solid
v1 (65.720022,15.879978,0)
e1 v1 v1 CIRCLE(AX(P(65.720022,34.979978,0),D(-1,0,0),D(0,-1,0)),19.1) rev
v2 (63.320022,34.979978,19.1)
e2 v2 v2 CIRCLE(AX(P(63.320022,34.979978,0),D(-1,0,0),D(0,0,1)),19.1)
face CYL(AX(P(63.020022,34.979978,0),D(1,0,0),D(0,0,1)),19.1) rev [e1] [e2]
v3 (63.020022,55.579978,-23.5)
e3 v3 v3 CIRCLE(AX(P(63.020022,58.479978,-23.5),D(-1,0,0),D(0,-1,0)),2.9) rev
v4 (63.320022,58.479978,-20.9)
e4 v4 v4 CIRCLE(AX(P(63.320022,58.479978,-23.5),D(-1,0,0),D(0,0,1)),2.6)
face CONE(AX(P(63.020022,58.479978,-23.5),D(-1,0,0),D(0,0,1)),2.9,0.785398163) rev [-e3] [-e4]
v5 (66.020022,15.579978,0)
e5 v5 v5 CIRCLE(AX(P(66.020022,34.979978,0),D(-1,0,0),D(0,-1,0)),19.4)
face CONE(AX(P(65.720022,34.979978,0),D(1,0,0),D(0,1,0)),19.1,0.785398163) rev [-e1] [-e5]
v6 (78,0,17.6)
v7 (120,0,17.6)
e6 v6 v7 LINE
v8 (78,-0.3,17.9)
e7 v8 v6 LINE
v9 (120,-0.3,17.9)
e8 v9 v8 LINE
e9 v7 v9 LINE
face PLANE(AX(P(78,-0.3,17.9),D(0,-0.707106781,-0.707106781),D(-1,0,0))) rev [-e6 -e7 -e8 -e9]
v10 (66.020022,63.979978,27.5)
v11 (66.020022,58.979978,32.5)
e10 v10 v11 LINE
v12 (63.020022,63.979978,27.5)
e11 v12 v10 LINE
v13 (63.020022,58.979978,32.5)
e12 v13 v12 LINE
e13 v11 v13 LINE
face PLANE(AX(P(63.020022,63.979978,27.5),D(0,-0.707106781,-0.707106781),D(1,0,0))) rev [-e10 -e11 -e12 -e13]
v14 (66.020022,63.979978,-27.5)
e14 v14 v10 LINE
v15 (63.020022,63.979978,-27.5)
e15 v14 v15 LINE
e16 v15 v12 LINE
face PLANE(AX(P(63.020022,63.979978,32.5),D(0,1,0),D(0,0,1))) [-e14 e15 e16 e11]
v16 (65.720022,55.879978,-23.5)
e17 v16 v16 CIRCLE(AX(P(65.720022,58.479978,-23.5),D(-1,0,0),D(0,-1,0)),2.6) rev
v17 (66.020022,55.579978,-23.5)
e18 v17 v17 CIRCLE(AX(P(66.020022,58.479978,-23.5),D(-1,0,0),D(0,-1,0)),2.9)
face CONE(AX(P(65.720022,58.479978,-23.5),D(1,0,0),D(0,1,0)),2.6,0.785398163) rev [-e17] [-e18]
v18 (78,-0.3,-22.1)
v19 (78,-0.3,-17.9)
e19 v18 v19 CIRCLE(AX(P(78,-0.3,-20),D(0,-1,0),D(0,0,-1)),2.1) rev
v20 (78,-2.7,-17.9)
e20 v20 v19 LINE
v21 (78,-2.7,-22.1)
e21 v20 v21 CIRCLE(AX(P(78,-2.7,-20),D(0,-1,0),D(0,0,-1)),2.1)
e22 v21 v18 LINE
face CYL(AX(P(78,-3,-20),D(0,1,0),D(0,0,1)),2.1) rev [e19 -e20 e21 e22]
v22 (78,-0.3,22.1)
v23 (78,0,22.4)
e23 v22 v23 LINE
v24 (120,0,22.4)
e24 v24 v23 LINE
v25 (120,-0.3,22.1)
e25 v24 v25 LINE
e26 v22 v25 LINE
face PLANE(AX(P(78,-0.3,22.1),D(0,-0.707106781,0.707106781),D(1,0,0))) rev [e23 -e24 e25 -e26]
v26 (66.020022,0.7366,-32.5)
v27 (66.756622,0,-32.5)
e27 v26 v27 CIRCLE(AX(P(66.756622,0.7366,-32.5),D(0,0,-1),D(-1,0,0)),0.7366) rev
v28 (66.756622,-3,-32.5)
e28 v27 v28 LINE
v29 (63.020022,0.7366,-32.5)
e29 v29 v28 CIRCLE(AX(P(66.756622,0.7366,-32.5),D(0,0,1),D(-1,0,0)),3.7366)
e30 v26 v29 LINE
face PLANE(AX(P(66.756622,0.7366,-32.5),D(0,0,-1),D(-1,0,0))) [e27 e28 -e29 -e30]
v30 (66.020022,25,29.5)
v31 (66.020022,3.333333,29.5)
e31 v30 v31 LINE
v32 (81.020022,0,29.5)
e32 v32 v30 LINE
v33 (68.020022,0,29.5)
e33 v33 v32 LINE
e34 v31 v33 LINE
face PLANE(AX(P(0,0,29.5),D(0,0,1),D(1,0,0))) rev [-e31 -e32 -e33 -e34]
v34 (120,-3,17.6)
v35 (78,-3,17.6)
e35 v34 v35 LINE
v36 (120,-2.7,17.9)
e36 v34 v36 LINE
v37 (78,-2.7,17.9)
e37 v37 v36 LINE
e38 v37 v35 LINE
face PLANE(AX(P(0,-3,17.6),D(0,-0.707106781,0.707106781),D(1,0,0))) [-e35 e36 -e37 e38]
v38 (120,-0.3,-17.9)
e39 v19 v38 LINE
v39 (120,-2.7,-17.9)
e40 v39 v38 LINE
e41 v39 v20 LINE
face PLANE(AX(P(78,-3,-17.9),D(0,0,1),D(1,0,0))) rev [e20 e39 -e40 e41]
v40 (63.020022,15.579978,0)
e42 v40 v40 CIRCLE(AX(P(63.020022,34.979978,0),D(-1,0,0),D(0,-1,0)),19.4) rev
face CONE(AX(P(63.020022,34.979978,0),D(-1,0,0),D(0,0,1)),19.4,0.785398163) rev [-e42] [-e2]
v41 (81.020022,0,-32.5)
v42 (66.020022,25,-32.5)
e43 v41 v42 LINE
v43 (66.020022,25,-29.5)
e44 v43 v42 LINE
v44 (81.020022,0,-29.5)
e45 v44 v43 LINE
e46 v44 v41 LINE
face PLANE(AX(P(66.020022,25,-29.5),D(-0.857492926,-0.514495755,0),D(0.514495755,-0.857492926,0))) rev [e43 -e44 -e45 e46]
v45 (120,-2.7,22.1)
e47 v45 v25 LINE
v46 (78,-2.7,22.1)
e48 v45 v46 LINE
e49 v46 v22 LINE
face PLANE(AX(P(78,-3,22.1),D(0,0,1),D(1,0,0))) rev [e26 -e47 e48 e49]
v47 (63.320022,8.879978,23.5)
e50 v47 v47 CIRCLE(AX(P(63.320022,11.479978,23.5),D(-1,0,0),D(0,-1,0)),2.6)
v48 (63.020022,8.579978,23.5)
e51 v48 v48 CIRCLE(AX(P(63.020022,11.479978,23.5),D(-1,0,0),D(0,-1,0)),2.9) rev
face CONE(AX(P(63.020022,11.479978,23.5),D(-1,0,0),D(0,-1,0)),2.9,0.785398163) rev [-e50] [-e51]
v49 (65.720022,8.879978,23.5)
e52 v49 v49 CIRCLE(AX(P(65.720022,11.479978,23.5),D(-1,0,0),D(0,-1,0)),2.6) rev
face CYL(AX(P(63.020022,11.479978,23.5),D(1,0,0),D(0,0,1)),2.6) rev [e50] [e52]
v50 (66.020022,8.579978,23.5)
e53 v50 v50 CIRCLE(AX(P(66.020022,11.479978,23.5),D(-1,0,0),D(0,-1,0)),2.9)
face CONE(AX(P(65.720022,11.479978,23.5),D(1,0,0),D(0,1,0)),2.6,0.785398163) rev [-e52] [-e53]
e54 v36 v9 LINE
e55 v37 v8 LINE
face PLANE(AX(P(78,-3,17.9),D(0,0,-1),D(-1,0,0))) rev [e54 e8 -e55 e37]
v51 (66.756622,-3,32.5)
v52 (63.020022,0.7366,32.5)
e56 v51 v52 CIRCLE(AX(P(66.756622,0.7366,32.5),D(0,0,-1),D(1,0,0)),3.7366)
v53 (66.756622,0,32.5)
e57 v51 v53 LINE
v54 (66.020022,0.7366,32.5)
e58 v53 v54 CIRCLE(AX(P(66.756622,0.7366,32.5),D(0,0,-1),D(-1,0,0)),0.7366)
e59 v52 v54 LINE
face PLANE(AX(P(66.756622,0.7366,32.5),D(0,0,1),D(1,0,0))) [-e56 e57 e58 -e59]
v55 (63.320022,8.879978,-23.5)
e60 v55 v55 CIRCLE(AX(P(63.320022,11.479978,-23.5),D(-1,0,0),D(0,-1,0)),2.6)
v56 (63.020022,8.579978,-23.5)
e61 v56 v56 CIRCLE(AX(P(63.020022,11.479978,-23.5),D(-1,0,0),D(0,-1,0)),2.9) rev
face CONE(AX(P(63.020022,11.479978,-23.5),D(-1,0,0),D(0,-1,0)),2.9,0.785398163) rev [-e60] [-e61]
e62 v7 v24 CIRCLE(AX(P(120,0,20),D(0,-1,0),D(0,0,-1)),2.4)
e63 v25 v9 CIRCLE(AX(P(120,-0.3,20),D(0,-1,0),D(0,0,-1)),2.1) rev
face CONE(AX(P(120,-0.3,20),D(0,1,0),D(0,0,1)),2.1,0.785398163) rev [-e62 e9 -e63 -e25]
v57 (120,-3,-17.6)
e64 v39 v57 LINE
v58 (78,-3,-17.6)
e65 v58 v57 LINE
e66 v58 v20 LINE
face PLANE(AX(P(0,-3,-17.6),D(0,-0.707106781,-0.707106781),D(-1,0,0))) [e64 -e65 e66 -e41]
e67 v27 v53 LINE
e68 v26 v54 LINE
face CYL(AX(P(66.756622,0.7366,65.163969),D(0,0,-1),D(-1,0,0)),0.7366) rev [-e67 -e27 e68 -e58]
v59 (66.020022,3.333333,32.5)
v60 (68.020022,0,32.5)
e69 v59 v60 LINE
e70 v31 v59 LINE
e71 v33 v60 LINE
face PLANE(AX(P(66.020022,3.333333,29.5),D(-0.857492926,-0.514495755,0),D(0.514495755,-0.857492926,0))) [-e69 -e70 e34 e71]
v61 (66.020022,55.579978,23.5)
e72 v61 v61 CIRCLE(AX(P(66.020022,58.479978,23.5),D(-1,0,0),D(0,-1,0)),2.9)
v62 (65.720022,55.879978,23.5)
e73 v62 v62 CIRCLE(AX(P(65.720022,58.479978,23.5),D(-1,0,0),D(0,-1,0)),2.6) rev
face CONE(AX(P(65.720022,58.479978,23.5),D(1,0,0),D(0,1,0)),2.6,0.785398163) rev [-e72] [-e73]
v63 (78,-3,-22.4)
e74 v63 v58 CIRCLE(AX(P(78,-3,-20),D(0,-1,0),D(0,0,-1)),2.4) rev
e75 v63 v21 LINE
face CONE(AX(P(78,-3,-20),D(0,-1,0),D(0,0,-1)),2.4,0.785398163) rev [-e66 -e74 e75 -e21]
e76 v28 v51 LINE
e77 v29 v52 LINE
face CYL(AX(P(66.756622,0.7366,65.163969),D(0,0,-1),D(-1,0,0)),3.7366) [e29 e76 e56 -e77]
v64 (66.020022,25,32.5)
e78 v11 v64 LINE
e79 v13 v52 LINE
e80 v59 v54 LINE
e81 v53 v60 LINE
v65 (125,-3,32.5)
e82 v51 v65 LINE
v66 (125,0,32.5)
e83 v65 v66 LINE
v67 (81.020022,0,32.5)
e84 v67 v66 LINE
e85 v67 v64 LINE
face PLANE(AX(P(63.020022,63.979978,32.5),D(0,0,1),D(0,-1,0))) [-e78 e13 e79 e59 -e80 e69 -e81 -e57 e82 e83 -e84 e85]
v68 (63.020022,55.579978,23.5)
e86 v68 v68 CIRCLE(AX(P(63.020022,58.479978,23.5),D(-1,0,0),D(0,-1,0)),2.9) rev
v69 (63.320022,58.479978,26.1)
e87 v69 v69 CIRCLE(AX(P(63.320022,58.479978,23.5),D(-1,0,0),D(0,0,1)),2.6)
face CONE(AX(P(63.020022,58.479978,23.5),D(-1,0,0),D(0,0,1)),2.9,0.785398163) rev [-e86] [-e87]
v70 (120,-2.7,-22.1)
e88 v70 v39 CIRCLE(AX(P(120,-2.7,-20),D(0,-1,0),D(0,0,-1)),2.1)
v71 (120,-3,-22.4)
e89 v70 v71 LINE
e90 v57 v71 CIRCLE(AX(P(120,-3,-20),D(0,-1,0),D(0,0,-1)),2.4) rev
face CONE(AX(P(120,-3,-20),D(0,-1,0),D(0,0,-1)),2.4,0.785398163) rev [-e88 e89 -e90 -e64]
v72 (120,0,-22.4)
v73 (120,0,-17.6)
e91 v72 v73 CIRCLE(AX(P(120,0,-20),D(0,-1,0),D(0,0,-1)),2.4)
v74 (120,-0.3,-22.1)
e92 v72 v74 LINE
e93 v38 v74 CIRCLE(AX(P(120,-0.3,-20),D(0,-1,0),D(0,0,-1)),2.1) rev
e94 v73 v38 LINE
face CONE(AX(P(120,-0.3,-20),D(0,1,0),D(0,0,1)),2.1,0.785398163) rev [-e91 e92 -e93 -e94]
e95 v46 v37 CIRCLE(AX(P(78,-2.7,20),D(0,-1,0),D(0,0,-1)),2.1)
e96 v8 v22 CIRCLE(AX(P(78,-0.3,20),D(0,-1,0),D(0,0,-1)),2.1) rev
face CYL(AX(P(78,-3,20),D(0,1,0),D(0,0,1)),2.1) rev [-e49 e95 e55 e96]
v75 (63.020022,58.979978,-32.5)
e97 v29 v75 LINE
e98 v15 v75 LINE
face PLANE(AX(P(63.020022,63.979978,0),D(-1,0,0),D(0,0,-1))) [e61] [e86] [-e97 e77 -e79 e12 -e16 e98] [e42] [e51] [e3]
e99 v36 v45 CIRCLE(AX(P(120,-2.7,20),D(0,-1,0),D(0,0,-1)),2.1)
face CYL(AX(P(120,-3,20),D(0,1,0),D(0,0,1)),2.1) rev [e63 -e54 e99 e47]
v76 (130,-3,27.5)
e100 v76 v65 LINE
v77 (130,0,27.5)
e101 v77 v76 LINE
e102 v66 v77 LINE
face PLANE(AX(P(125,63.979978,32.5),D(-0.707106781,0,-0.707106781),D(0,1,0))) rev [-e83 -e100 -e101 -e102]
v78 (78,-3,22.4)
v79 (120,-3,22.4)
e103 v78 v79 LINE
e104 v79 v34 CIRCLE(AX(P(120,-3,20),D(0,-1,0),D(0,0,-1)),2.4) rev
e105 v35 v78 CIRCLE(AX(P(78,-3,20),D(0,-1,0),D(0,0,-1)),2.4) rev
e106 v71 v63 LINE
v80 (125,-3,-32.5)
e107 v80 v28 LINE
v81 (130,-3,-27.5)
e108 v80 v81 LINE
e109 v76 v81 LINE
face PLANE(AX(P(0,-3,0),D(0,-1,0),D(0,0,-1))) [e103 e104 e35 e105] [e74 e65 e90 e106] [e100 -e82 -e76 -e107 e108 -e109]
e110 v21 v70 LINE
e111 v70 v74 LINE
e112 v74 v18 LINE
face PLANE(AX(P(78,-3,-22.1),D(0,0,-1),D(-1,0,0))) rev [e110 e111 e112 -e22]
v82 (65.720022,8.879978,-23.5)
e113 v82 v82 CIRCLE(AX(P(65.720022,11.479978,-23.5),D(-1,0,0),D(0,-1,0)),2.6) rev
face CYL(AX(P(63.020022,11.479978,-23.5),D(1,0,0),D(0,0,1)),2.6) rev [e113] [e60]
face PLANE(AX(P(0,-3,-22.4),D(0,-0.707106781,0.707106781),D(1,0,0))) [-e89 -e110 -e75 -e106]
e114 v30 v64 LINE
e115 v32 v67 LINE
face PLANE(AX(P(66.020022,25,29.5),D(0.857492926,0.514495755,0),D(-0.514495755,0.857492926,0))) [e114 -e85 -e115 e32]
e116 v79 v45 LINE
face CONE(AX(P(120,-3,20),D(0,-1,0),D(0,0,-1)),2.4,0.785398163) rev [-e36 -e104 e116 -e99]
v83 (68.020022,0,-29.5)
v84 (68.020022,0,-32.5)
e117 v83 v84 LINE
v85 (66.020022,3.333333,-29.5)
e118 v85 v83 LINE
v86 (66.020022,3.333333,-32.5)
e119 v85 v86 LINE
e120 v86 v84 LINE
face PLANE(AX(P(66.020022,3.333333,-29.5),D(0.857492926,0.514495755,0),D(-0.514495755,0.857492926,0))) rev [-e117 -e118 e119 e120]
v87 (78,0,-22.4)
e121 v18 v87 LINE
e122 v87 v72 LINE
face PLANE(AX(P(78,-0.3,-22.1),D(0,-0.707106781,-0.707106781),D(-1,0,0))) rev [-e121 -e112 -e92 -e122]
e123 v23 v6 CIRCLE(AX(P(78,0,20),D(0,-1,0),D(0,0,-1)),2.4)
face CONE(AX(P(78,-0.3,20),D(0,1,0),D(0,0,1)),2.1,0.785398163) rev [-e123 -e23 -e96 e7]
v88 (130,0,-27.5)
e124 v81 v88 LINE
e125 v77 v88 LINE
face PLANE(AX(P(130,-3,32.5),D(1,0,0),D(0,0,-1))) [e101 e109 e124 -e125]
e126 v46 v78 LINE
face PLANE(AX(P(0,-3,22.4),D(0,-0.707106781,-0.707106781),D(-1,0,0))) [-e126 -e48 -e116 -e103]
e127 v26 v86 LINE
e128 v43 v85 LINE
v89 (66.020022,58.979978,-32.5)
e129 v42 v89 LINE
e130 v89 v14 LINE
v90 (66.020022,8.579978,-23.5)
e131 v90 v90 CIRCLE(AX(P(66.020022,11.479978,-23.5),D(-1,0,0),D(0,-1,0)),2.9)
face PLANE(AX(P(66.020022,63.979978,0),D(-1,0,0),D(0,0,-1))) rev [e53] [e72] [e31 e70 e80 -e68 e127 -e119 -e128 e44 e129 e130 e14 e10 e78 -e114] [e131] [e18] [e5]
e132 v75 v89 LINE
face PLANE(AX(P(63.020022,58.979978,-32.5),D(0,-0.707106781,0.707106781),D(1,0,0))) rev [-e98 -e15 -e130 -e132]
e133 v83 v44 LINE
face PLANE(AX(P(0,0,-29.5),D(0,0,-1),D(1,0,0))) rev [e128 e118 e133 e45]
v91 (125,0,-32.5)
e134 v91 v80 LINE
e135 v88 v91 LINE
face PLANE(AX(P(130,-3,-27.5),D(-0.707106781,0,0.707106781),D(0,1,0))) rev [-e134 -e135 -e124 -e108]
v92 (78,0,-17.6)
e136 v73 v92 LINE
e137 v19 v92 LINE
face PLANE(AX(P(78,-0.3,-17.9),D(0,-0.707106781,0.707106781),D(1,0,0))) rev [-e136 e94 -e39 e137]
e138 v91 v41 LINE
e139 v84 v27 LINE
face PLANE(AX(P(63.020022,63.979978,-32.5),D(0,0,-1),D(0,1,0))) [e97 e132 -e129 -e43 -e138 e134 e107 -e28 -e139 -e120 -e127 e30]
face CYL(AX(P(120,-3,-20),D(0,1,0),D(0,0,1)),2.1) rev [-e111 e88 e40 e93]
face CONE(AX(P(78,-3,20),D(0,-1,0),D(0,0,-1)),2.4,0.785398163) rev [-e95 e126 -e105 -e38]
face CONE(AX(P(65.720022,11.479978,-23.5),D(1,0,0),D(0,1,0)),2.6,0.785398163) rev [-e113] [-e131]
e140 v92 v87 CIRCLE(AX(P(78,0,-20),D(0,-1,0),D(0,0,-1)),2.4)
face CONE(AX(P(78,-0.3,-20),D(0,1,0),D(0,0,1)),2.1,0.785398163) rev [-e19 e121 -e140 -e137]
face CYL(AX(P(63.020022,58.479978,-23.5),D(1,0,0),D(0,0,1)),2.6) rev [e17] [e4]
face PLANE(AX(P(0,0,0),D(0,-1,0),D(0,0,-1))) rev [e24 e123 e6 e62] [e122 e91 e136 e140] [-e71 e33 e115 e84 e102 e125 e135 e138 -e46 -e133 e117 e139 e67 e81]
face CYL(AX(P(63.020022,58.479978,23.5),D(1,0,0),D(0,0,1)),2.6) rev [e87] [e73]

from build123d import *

# Parameters (mm, degrees)
SKETCH1_W                    = 130
SKETCH1_H                    = 65
BASE_FLANGE1_DEPTH           = 3
SKETCH2_R                    = 19.1
SKETCH2_R_2                  = 2.6
CUT_EXTRUDE1_DEPTH           = 135.034510481
CUT_EXTRUDE3_DEPTH           = 135.034510481
SKETCHED_BEND2_OUTLINE_W     = 3
SKETCHED_BEND2_OUTLINE_H     = 65
SKETCHED_BEND2_DEPTH         = 63.020021532
SKETCHED_START               = 63.383443248
SKETCHED_BEND2_2_OUTLINE_W   = 63.979978468
SKETCHED_BEND2_2_OUTLINE_H   = 65
SKETCHED_BEND2_2_OUTLINE_R   = 2.6
SKETCHED_BEND2_2_OUTLINE_R_2 = 19.1
SKETCHED_BEND2_2_DEPTH       = 2.636578284
SKETCHED_START_2             = 63.020021532
SKETCHED_BEND2_3_OUTLINE_W   = 63.979978468
SKETCHED_BEND2_3_OUTLINE_H   = 65
SKETCHED_BEND2_3_OUTLINE_R   = 2.6
SKETCHED_BEND2_3_OUTLINE_R_2 = 19.1
SKETCHED_BEND2_3_DEPTH       = 3.7366
SKETCHED_START_3             = -33
SKETCHED_BEND2_4_DEPTH       = 66
BOSS_EXTRUDE1_DEPTH          = 3
CHAMFER1_SIZE                = 5
CHAMFER2_SIZE                = 0.3


with BuildPart() as part:
    # Base-Flange1: sheet metal written as solids
    # Sketch1 → Base-Flange1 (new body)
    with BuildSketch(Plane(origin=(0, 0, 0), x_dir=(1, 0, 0), z_dir=(0, 1, 0))):
        with Locations((65, 0)):
            Rectangle(SKETCH1_W, SKETCH1_H)
    extrude(amount=-BASE_FLANGE1_DEPTH)

    # Sketch2 → Cut-Extrude1 (cut, through all)
    with BuildSketch(Plane(origin=(0, 0, 0), x_dir=(1, 0, 0), z_dir=(0, 1, 0))):
        with Locations(Location((29, 0, 0), (0, 0, 270))):
            Circle(SKETCH2_R)
        with Locations(Location((5.5, 23.5, 0), (0, 0, 270))):
            Circle(SKETCH2_R_2)
        with Locations(Location((52.5, 23.5, 0), (0, 0, 270))):
            Circle(SKETCH2_R_2)
        with Locations(Location((52.5, -23.5, 0), (0, 0, 270))):
            Circle(SKETCH2_R_2)
        with Locations(Location((5.5, -23.5, 0), (0, 0, 270))):
            Circle(SKETCH2_R_2)
    extrude(amount=-CUT_EXTRUDE1_DEPTH, mode=Mode.SUBTRACT)

    # Sketch4 → Cut-Extrude3 (cut, through all)
    with BuildSketch(Plane(origin=(0, 0, 0), x_dir=(1, 0, 0), z_dir=(0, 1, 0))):
        with BuildLine():
            Line((78, 22.1), (120, 22.1))
            ThreePointArc((120, 22.1), (122.1, 20), (120, 17.9))
            Line((120, 17.9), (78, 17.9))
            ThreePointArc((78, 17.9), (75.9, 20), (78, 22.1))
        make_face()
        with BuildLine():
            Line((78, -17.9), (120, -17.9))
            ThreePointArc((120, -17.9), (122.1, -20), (120, -22.1))
            Line((120, -22.1), (78, -22.1))
            ThreePointArc((78, -22.1), (75.9, -20), (78, -17.9))
        make_face()
    extrude(amount=-CUT_EXTRUDE3_DEPTH, mode=Mode.SUBTRACT)

    # Sketched Bend2: read off the stored shape, not the designer's step
    # Sketched Bend2 outline → Sketched Bend2 (cut)
    with BuildSketch(Plane.YZ):
        with Locations((-1.5, 0)):
            Rectangle(SKETCHED_BEND2_OUTLINE_W, SKETCHED_BEND2_OUTLINE_H)
    extrude(amount=SKETCHED_BEND2_DEPTH, mode=Mode.SUBTRACT)

    # Sketched Bend2 2 outline → Sketched Bend2 2 (add)
    with BuildSketch(Plane.YZ.offset(SKETCHED_START)):
        with Locations((31.989989234, 0)):
            Rectangle(SKETCHED_BEND2_2_OUTLINE_W, SKETCHED_BEND2_2_OUTLINE_H)
        with Locations((11.479978468, -23.5)):
            Circle(SKETCHED_BEND2_2_OUTLINE_R, mode=Mode.SUBTRACT)
        with Locations((58.479978468, -23.5)):
            Circle(SKETCHED_BEND2_2_OUTLINE_R, mode=Mode.SUBTRACT)
        with Locations((11.479978468, 23.5)):
            Circle(SKETCHED_BEND2_2_OUTLINE_R, mode=Mode.SUBTRACT)
        with Locations((34.979978468, 0)):
            Circle(SKETCHED_BEND2_2_OUTLINE_R_2, mode=Mode.SUBTRACT)
        with Locations((58.479978468, 23.5)):
            Circle(SKETCHED_BEND2_2_OUTLINE_R, mode=Mode.SUBTRACT)
    extrude(amount=SKETCHED_BEND2_2_DEPTH)

    # Sketched Bend2 3 outline → Sketched Bend2 3 (add)
    with BuildSketch(Plane.YZ.offset(SKETCHED_START_2)):
        with Locations((31.989989234, 0)):
            Rectangle(SKETCHED_BEND2_3_OUTLINE_W, SKETCHED_BEND2_3_OUTLINE_H)
        with Locations((11.479978468, -23.5)):
            Circle(SKETCHED_BEND2_3_OUTLINE_R, mode=Mode.SUBTRACT)
        with Locations((58.479978468, -23.5)):
            Circle(SKETCHED_BEND2_3_OUTLINE_R, mode=Mode.SUBTRACT)
        with Locations((11.479978468, 23.5)):
            Circle(SKETCHED_BEND2_3_OUTLINE_R, mode=Mode.SUBTRACT)
        with Locations((34.979978468, 0)):
            Circle(SKETCHED_BEND2_3_OUTLINE_R_2, mode=Mode.SUBTRACT)
        with Locations((58.479978468, 23.5)):
            Circle(SKETCHED_BEND2_3_OUTLINE_R, mode=Mode.SUBTRACT)
    extrude(amount=SKETCHED_BEND2_3_DEPTH)

    # Sketched Bend2 4 outline → Sketched Bend2 4 (cut)
    with BuildSketch(Plane.XY.offset(SKETCHED_START_3)):
        with BuildLine():
            Line((66.756621532, 63.979978468), (66.020021532, 63.979978468))
            Line((66.020021532, 63.979978468), (66.020021532, 0.7366))
            ThreePointArc((66.020021532, 0.7366), (66.235766677, 0.215745145), (66.756621532, 0))
            Line((66.756621532, 0), (66.756621532, 63.979978468))
        make_face()
        with BuildLine():
            ThreePointArc((66.756621532, -3), (64.114446333, -1.905575199), (63.020021532, 0.7366))
            Line((63.020021532, 0.7366), (63.020021532, -3))
            Line((63.020021532, -3), (66.756621532, -3))
        make_face()
    extrude(amount=SKETCHED_BEND2_4_DEPTH, mode=Mode.SUBTRACT)

    # Sketch6 → Boss-Extrude1 (add)
    with BuildSketch(Plane.XY.offset(32.5)):
        Polygon((66.020021532, 25), (81.020021532, 0), (68.020021532, 0), (66.020021532, 3.333333333), align=None)
    boss_extrude1 = extrude(amount=-BOSS_EXTRUDE1_DEPTH)

    # Mirror1: Boss-Extrude1 across plane
    add(boss_extrude1.mirror(Plane.XY))

    # Chamfer1
    chamfer1_edges = [part.edges().sort_by_distance(p)[0] for p in [
        (64.520021532, 63.979978468, -32.5),
        (64.520021532, 63.979978468, 32.5),
        (130, -1.5, -32.5),
        (130, -1.5, 32.5),
    ]]
    chamfer(chamfer1_edges, length=CHAMFER1_SIZE)

    # Chamfer2
    chamfer2_edges = [part.edges().sort_by_distance(p)[0] for p in [
        (63.020021532, 15.879978468, 0),
        (66.020021532, 15.879978468, 0),
        (63.020021532, 55.879978468, -23.5),
        (66.020021532, 55.879978468, -23.5),
        (63.020021532, 8.879978468, -23.5),
        (66.020021532, 8.879978468, -23.5),
        (63.020021532, 8.879978468, 23.5),
        (66.020021532, 8.879978468, 23.5),
        (63.020021532, 55.879978468, 23.5),
        (66.020021532, 55.879978468, 23.5),
        (99, 0, -22.1),
        (122.1, 0, -20),
        (99, 0, -17.9),
        (75.9, 0, -20),
        (99, 0, 17.9),
        (122.1, 0, 20),
        (99, 0, 22.1),
        (75.9, 0, 20),
        (75.9, -3, 20),
        (99, -3, 22.1),
        (122.1, -3, 20),
        (99, -3, 17.9),
        (75.9, -3, -20),
        (99, -3, -17.9),
        (122.1, -3, -20),
        (99, -3, -22.1),
    ]]
    chamfer(chamfer2_edges, length=CHAMFER2_SIZE)


solid = part.part
